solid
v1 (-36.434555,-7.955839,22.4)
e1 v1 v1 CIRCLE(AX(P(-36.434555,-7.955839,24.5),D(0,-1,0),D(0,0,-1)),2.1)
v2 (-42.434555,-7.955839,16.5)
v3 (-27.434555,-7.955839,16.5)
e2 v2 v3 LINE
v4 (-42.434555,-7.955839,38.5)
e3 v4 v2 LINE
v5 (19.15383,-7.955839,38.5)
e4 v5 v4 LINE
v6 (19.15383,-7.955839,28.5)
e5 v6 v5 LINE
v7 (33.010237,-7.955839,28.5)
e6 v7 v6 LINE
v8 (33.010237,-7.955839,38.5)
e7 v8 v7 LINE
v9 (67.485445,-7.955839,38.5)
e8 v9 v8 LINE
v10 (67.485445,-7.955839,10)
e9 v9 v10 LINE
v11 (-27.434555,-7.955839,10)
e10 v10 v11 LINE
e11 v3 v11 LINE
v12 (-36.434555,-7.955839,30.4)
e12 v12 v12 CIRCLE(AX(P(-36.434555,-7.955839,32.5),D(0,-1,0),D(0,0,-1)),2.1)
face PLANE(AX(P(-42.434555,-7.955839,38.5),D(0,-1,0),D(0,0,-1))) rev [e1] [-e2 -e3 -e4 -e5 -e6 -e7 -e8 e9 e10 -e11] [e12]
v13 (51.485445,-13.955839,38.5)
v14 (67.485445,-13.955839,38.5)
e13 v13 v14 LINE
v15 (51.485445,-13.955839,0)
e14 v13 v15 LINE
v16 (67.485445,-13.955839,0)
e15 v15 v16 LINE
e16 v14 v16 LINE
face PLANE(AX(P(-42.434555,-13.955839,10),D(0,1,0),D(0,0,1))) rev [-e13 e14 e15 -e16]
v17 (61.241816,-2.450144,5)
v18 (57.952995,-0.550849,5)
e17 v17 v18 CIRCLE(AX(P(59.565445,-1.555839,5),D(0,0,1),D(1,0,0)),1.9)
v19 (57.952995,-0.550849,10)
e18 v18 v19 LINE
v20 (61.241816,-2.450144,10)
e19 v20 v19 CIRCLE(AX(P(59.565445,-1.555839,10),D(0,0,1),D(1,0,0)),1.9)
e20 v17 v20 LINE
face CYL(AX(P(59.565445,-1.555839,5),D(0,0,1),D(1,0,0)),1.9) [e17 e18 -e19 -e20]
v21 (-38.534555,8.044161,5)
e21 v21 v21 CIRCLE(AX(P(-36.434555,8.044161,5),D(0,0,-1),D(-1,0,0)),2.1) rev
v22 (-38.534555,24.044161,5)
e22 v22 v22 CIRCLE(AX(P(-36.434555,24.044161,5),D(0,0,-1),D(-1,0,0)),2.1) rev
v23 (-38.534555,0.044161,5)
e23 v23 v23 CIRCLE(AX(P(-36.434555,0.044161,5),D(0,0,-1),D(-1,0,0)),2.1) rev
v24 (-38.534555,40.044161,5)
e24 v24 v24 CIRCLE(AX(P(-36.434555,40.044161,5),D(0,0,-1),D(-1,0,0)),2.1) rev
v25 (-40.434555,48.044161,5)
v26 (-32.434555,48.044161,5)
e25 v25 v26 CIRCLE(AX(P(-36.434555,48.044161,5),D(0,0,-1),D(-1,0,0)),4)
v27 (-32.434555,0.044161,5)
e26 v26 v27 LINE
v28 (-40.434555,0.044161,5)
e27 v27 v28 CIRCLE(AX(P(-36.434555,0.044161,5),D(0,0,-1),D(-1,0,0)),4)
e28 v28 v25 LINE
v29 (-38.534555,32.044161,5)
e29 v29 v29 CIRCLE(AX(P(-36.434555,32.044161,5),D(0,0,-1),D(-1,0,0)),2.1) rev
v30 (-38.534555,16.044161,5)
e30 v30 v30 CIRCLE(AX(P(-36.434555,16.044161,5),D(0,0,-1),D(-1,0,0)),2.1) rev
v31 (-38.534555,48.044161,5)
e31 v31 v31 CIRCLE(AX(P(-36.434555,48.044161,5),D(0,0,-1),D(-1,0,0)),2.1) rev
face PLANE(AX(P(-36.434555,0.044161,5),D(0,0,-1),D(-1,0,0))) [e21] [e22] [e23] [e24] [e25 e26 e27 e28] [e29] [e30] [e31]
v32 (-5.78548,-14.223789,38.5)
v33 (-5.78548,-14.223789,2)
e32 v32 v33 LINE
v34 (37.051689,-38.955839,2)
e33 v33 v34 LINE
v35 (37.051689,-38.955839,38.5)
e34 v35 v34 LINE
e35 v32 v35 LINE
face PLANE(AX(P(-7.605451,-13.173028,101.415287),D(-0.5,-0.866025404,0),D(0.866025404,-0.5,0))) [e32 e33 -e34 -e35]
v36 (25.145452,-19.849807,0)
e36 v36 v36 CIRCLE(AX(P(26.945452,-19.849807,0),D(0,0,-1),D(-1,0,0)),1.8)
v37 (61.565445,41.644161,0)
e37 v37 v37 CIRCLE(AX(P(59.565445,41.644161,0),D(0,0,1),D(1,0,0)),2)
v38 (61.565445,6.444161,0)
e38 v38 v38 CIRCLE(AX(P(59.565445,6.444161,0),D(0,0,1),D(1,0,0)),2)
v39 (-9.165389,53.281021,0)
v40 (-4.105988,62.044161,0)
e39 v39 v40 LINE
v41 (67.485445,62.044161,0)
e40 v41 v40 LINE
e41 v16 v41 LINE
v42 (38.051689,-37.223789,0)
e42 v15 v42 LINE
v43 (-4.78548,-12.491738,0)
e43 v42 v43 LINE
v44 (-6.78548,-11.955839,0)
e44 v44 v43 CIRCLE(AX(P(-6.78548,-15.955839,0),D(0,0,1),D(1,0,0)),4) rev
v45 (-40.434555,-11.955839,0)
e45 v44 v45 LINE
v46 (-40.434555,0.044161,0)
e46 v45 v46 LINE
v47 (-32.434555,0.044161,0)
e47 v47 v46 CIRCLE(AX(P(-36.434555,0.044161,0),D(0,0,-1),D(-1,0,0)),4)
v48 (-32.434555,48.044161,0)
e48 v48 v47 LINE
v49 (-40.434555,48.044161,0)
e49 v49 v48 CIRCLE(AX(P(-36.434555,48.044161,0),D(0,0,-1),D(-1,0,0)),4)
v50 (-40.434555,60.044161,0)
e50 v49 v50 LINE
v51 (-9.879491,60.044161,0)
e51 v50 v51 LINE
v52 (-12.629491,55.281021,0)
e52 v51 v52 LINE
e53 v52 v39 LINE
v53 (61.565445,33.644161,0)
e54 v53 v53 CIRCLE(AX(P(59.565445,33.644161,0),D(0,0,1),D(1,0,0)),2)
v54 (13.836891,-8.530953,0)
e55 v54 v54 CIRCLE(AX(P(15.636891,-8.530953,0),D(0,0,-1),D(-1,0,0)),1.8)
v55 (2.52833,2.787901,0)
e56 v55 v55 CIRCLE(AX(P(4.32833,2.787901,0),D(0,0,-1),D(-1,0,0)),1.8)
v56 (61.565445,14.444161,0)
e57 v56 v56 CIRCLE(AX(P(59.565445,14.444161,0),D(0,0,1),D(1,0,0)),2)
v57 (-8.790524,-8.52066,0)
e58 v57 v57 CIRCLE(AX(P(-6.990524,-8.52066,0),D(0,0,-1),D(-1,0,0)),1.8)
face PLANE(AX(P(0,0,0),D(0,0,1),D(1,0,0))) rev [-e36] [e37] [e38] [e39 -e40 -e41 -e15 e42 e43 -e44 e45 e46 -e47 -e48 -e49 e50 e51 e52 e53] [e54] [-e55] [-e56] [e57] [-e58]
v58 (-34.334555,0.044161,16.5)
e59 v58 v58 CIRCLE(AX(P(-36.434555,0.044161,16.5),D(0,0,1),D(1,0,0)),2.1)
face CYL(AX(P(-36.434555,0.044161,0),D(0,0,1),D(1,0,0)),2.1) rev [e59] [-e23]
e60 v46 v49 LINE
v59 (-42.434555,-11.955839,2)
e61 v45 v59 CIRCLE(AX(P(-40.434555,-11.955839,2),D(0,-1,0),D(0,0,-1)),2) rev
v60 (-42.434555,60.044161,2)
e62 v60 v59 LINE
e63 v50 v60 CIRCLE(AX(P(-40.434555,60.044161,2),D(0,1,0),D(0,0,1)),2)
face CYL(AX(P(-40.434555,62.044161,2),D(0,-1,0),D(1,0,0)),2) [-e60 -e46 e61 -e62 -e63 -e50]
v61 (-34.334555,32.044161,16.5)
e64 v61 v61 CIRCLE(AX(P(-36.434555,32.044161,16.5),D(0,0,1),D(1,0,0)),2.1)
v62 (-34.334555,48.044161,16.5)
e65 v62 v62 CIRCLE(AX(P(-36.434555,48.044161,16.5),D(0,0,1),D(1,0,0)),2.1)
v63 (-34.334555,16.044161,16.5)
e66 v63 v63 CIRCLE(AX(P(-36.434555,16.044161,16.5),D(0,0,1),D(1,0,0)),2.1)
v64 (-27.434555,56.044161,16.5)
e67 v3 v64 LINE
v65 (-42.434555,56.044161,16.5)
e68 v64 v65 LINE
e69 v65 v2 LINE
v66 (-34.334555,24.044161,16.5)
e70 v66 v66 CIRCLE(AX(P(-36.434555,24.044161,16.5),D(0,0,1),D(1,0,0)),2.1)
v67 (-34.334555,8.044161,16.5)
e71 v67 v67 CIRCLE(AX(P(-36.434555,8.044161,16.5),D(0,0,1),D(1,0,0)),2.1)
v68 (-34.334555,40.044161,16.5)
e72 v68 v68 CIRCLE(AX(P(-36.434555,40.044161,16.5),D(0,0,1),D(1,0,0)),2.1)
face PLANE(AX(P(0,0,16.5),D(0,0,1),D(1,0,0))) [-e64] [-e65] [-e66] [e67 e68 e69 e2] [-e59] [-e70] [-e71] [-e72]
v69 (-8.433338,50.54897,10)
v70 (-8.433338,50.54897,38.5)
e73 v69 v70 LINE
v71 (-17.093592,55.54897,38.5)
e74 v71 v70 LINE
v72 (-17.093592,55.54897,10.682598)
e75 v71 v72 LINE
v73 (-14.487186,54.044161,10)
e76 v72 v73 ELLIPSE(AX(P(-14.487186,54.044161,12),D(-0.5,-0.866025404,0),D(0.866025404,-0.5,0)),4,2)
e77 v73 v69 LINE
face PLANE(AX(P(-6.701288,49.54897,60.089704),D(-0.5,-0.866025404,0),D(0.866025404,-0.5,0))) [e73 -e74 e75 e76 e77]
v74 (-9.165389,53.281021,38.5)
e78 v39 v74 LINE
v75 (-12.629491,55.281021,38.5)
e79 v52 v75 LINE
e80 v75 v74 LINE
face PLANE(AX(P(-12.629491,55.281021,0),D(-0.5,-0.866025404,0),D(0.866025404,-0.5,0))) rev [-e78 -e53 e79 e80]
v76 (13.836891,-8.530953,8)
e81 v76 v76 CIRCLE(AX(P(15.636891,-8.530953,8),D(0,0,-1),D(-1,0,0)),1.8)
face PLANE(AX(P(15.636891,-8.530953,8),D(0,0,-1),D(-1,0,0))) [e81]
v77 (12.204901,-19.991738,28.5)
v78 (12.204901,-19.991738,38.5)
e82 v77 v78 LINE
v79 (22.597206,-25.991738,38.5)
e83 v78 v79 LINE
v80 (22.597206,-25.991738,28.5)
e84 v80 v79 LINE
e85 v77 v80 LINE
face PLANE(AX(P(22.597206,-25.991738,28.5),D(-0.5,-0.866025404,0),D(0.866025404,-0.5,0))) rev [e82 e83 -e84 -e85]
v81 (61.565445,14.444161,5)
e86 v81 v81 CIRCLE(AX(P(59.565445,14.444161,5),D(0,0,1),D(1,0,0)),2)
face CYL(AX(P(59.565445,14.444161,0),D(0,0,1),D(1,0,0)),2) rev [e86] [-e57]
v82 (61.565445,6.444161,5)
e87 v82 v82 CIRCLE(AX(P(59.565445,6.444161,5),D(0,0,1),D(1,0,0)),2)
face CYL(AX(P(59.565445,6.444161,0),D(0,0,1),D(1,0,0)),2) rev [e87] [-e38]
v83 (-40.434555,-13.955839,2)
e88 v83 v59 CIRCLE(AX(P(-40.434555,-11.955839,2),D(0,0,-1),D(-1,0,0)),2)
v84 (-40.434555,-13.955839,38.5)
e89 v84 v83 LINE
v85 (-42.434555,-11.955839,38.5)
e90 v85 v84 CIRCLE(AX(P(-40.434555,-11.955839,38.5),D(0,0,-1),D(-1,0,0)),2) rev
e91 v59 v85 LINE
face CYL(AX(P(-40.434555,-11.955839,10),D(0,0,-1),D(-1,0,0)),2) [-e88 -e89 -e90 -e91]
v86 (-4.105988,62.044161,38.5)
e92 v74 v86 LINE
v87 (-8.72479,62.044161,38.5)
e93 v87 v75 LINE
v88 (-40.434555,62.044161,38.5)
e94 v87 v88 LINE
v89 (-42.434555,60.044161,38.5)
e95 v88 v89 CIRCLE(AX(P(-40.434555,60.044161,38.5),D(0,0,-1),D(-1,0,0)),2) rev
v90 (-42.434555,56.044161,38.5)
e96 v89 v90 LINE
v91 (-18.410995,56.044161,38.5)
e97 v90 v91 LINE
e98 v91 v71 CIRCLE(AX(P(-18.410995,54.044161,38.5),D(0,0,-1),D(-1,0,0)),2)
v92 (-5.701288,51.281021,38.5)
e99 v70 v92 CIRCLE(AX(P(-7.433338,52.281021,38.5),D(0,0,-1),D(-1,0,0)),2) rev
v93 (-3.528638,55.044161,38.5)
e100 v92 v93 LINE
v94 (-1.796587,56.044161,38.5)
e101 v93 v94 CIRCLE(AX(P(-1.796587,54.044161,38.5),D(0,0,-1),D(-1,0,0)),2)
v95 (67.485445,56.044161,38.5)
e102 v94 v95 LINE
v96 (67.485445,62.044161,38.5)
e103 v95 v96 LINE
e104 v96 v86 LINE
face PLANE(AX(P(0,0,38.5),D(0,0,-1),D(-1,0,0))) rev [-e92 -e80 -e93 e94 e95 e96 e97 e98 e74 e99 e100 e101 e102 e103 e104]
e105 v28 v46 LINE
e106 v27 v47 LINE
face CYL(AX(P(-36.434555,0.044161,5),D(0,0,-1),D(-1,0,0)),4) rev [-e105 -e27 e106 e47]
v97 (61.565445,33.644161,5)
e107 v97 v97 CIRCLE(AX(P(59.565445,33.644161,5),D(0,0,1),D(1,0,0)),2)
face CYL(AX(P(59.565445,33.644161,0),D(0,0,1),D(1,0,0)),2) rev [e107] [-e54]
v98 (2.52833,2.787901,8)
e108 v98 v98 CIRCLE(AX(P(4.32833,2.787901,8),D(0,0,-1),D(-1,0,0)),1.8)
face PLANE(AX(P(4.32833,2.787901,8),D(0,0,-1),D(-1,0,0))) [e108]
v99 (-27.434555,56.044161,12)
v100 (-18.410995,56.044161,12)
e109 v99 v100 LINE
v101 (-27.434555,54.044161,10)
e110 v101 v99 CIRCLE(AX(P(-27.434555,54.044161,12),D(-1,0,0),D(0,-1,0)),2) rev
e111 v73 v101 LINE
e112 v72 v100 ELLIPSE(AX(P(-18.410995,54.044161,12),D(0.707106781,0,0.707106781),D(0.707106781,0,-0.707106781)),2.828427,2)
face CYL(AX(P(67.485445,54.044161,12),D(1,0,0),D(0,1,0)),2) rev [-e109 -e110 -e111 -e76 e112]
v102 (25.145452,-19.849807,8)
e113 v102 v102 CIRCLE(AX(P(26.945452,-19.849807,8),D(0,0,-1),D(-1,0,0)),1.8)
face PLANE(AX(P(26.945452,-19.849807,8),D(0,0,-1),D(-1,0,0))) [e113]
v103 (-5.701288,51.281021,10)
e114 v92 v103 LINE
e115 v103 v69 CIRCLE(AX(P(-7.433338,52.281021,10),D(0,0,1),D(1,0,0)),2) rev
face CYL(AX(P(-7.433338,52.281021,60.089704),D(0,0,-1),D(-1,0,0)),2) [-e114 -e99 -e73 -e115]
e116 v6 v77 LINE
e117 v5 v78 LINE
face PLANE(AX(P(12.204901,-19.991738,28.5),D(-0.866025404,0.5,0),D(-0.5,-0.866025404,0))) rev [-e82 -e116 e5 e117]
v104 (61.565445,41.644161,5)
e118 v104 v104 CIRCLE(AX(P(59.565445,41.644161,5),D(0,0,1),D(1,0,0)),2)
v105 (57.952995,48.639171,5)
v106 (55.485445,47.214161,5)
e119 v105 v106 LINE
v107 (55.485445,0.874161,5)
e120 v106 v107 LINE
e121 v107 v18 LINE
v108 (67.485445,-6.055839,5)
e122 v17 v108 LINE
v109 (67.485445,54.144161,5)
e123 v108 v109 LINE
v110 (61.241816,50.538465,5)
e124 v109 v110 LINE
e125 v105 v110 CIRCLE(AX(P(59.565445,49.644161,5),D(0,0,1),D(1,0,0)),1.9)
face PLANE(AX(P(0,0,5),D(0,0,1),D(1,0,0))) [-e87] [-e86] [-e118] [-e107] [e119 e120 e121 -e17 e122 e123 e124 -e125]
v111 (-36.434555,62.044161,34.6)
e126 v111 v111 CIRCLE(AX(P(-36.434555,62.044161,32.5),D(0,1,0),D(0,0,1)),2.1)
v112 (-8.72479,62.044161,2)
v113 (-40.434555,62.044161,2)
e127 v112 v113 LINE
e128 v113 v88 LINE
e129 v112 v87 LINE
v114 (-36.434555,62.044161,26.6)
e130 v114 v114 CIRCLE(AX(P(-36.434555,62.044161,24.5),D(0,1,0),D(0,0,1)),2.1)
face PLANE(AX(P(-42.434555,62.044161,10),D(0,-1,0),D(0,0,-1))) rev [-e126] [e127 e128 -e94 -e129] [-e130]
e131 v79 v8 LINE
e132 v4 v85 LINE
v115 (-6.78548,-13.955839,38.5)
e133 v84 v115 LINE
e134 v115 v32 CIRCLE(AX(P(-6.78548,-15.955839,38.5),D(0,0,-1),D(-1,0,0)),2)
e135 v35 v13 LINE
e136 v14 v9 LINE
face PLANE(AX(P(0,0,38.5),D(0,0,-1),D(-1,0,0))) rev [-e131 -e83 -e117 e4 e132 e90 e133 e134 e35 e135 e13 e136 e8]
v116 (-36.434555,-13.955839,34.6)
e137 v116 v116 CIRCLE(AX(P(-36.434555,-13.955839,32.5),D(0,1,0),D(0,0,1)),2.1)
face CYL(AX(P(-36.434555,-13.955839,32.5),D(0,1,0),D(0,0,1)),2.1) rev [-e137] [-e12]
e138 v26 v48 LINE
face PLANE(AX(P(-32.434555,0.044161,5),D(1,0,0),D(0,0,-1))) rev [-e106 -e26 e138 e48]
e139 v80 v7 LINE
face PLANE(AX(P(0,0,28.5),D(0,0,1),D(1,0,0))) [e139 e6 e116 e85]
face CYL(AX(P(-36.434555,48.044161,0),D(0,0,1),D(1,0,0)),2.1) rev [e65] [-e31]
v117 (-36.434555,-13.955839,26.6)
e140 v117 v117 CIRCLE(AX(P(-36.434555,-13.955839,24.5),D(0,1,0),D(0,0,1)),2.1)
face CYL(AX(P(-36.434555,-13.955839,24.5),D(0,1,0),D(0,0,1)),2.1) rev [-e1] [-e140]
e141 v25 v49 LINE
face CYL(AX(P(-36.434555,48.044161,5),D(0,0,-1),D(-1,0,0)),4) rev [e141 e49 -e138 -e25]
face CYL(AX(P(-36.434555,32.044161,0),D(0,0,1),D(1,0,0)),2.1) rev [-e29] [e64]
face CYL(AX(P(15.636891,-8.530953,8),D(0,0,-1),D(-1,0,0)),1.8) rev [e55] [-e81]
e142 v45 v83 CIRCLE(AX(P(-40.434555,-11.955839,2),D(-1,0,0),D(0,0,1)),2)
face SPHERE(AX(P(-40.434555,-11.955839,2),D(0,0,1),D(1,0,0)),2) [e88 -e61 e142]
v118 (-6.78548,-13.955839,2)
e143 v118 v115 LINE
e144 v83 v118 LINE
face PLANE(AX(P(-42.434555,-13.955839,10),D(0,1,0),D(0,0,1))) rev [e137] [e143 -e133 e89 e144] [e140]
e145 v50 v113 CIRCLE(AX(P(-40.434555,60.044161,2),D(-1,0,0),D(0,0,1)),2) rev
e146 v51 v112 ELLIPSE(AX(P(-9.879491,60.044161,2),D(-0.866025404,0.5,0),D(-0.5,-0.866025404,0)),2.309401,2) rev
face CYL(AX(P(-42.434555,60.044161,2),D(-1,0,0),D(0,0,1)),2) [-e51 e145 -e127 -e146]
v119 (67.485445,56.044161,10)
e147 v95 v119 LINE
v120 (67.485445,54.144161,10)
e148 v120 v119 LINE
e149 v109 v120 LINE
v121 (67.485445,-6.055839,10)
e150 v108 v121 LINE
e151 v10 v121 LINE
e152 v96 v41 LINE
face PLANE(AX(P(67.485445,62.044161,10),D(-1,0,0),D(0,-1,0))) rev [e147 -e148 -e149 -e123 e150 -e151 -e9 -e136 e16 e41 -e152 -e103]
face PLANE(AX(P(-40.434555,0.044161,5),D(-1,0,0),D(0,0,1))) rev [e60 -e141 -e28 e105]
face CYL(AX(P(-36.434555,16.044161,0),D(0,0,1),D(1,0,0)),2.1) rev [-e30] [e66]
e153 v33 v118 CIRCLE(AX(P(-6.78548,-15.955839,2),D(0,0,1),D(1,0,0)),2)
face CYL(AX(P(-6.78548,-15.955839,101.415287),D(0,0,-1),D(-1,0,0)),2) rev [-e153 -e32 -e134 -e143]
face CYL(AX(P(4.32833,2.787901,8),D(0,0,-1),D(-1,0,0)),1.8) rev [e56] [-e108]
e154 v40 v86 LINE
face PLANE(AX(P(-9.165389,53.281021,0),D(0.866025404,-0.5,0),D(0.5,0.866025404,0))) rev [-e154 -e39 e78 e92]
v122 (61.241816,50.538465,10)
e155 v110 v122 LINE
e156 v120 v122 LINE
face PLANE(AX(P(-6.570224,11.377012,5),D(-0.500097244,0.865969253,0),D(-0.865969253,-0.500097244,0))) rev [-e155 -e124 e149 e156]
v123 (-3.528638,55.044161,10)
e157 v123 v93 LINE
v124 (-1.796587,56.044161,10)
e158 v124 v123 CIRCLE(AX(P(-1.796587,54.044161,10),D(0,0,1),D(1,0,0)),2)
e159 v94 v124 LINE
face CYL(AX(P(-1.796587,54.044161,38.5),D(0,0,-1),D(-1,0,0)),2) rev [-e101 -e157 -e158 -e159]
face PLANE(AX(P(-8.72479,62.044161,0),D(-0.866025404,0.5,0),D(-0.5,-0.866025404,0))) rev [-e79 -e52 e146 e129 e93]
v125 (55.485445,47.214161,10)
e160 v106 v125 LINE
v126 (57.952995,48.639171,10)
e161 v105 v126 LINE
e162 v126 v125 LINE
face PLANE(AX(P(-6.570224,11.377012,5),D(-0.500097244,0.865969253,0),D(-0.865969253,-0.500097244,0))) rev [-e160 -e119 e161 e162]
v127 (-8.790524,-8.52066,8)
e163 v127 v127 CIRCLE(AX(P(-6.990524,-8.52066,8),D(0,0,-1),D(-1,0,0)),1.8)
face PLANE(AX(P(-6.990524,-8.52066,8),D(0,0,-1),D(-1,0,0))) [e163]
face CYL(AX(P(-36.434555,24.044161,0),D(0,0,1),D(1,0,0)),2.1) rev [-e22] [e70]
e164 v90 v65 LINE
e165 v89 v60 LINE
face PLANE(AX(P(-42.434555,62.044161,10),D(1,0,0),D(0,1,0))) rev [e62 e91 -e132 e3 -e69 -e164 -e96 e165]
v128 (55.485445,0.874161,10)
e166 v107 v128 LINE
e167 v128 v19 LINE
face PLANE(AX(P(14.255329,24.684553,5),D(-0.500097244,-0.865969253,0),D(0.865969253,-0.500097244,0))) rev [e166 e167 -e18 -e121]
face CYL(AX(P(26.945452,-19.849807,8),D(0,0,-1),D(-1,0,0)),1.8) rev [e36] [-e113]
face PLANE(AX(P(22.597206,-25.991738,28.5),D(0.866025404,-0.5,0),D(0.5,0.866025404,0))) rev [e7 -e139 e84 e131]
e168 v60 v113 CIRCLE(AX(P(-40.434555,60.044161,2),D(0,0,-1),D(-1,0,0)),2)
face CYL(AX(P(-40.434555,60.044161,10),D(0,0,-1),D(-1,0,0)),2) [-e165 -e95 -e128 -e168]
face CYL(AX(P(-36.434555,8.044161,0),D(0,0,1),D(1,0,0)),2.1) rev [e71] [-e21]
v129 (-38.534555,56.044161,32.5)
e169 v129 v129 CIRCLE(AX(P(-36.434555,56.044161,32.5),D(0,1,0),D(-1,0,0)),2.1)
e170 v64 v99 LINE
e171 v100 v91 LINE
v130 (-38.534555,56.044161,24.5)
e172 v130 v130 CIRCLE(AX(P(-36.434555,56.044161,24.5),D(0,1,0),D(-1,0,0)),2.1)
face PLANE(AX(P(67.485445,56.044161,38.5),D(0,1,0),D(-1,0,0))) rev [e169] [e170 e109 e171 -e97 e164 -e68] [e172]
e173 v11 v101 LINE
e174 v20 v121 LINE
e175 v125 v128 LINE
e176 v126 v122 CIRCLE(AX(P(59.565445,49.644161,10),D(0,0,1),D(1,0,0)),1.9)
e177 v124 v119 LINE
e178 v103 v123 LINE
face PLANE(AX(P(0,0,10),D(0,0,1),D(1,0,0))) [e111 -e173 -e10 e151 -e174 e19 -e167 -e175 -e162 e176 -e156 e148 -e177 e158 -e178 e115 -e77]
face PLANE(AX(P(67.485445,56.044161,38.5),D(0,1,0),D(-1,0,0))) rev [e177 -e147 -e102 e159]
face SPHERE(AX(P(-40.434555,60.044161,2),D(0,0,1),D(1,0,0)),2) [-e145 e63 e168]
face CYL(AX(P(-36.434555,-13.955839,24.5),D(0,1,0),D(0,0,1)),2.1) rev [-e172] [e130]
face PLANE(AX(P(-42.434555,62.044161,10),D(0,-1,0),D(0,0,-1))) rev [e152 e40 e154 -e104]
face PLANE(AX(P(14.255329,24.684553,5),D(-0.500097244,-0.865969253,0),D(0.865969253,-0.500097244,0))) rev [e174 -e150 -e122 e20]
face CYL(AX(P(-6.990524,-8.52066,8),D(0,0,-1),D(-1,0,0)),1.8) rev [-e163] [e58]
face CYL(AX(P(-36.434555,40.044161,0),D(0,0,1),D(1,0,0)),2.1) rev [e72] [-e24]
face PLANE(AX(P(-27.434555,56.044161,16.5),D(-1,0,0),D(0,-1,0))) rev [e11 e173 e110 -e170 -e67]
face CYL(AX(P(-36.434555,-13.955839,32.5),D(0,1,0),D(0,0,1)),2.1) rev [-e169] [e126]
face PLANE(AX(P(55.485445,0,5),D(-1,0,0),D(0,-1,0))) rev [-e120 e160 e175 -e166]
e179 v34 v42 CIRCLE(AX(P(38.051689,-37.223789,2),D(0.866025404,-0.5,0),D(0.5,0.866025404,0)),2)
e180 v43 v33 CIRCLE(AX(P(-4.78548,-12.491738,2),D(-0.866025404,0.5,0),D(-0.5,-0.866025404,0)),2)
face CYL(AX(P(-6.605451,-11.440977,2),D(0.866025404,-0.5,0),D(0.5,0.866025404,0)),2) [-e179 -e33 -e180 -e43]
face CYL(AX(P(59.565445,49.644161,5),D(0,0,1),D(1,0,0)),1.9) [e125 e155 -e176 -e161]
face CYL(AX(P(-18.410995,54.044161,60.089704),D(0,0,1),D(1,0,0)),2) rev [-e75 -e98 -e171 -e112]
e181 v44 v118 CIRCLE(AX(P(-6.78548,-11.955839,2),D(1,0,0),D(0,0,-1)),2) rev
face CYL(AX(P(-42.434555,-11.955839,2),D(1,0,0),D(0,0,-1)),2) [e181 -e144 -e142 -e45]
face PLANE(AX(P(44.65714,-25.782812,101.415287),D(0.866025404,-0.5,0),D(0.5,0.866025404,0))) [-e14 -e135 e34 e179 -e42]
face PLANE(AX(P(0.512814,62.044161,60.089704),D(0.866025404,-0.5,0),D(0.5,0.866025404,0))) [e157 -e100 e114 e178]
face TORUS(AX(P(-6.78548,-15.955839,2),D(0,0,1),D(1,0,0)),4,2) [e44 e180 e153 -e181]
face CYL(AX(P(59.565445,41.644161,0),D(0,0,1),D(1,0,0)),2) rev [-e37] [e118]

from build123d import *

# Parameters (mm, degrees)
SKETCH_2_W               = 109.92
SKETCH_2_H               = 76
EXTRUDE_1_DEPTH          = 10
CUT_EXTRUDE_1_DEPTH      = 5
SKETCH_4_R               = 2
CUT_EXTRUDE_2_DEPTH      = 92.808295873
SKETCH_5_W               = 109.92
SKETCH_5_H               = 6
EXTRUDE_2_DEPTH          = 28.5
SKETCH_6_W               = 15
SKETCH_6_H               = 64
EXTRUDE_3_DEPTH          = 6.5
CUT_EXTRUDE_3_DEPTH      = 105.577891178
CUT_EXTRUDE_3_DEPTH_BACK = 105.577891178
SKETCH_7_R               = 2.1
SKETCH_9_R               = 2.1
CUT_EXTRUDE_4_DEPTH      = 95.274934055
CUT_EXTRUDE_5_DEPTH      = 5
EXTRUDE_4_DEPTH          = 38.5
CUT_EXTRUDE_6_DEPTH      = 10
CUT_EXTRUDE_7_REACH      = 103.379
SKETCH_18_W              = 12
SKETCH_18_H              = 10
EXTRUDE_5_DEPTH          = 38.5
CUT_EXTRUDE_8_DEPTH      = 100.428432508
FILLET_1_R               = 2
SKETCH_23_R              = 1.8
CUT_EXTRUDE_10_DEPTH     = 8


with BuildPart() as part:
    # 草圖2 → 填料-伸長1 (new body)
    with BuildSketch(Plane.XY):
        with Locations((12.52544527, 24.044160626)):
            Rectangle(SKETCH_2_W, SKETCH_2_H)
    extrude(amount=EXTRUDE_1_DEPTH)

    # 草圖3 → 除料-伸長1 (cut)
    with BuildSketch(Plane.XY.offset(10)):
        with BuildLine():
            Line((67.48544527, -6.055839374), (67.48544527, 54.144160626))
            Line((67.48544527, 54.144160626), (61.24181631, 50.538464901))
            ThreePointArc((61.24181631, 50.538464901), (61.408690367, 50.105080914), (61.46544527, 49.644160626))
            ThreePointArc((61.46544527, 49.644160626), (60.088104264, 47.81746208), (57.95299519, 48.639170705))
            Line((57.95299519, 48.639170705), (55.48544527, 47.214160626))
            Line((55.48544527, 47.214160626), (55.48544527, 0.874160626))
            Line((55.48544527, 0.874160626), (57.95299519, -0.550849453))
            ThreePointArc((57.95299519, -0.550849453), (60.088104264, 0.270859171), (61.46544527, -1.555839374))
            ThreePointArc((61.46544527, -1.555839374), (61.408690367, -2.016759663), (61.24181631, -2.45014365))
            Line((61.24181631, -2.45014365), (67.48544527, -6.055839374))
        make_face()
    extrude(amount=-CUT_EXTRUDE_1_DEPTH, mode=Mode.SUBTRACT)

    # 草圖4 → 除料-伸長2 (cut, through all)
    with BuildSketch(Plane.XY.offset(5)):
        with Locations((59.56544527, 41.644160626)):
            Circle(SKETCH_4_R)
        with Locations((59.56544527, 33.644160626)):
            Circle(SKETCH_4_R)
        with Locations((59.56544527, 6.444160626)):
            Circle(SKETCH_4_R)
        with Locations((59.56544527, 14.444160626)):
            Circle(SKETCH_4_R)
    extrude(amount=-CUT_EXTRUDE_2_DEPTH, mode=Mode.SUBTRACT)

    # 草圖5 → 填料-伸長2 (add)
    with BuildSketch(Plane.XY.offset(10)):
        with Locations((12.52544527, -10.955839374)):
            Rectangle(SKETCH_5_W, SKETCH_5_H)
        with Locations((12.52544527, 59.044160626)):
            Rectangle(SKETCH_5_W, SKETCH_5_H)
    extrude(amount=EXTRUDE_2_DEPTH)

    # 草圖6 → 填料-伸長3 (add)
    with BuildSketch(Plane.XY.offset(10)):
        with Locations((-34.93455473, 24.044160626)):
            Rectangle(SKETCH_6_W, SKETCH_6_H)
    extrude(amount=EXTRUDE_3_DEPTH)

    # 草圖7 → 除料-伸長3 (cut, two sides: drawn at the far end of the back side and taken through both)
    with BuildSketch(Plane(origin=(0, -7.955839374, 0), x_dir=(1, 0, 0), z_dir=(0, 1, 0)).offset(-CUT_EXTRUDE_3_DEPTH_BACK)):
        with Locations(Location((-36.43455473, -24.5, 0), (0, 0, 270))):
            Circle(SKETCH_7_R)
        with Locations(Location((-36.43455473, -32.5, 0), (0, 0, 270))):
            Circle(SKETCH_7_R)
    extrude(amount=CUT_EXTRUDE_3_DEPTH + CUT_EXTRUDE_3_DEPTH_BACK, mode=Mode.SUBTRACT)

    # 草圖9 → 除料-伸長4 (cut, through all)
    with BuildSketch(Plane.XY.offset(16.5)):
        with Locations((-36.43455473, 0.044160626)):
            Circle(SKETCH_9_R)
        with Locations((-36.43455473, 8.044160626)):
            Circle(SKETCH_9_R)
        with Locations((-36.43455473, 16.044160626)):
            Circle(SKETCH_9_R)
        with Locations((-36.43455473, 24.044160626)):
            Circle(SKETCH_9_R)
        with Locations((-36.43455473, 32.044160626)):
            Circle(SKETCH_9_R)
        with Locations((-36.43455473, 40.044160626)):
            Circle(SKETCH_9_R)
        with Locations((-36.43455473, 48.044160626)):
            Circle(SKETCH_9_R)
    extrude(amount=-CUT_EXTRUDE_4_DEPTH, mode=Mode.SUBTRACT)

    # 草圖10 → 除料-伸長5 (cut)
    with BuildSketch(Plane(origin=(0, 0, 0), x_dir=(-1, 0, 0), z_dir=(0, 0, -1))):
        with BuildLine():
            Line((32.43455473, 0.044160626), (32.43455473, 48.044160626))
            ThreePointArc((32.43455473, 48.044160626), (36.43455473, 52.044160626), (40.43455473, 48.044160626))
            Line((40.43455473, 48.044160626), (40.43455473, 0.044160626))
            ThreePointArc((40.43455473, 0.044160626), (36.43455473, -3.955839374), (32.43455473, 0.044160626))
        make_face()
    extrude(amount=-CUT_EXTRUDE_5_DEPTH, mode=Mode.SUBTRACT)

    # 草圖11 → 填料-伸長4 (add)
    with BuildSketch(Plane(origin=(0, 0, 0), x_dir=(-1, 0, 0), z_dir=(0, 0, -1))):
        Polygon((6.249581649, -13.955839374), (-51.48544527, -13.955839374), (-37.05168854, -38.955839374), align=None)
    extrude(amount=-EXTRUDE_4_DEPTH)

    # 草圖17 → 除料-伸長6 (cut)
    with BuildSketch(Plane.XY.offset(38.5)):
        Polygon((22.597205868, -25.991737759), (12.204901023, -19.991737759), (16.704901023, -12.197509125), (27.097205868, -18.197509125), align=None)
    extrude(amount=-CUT_EXTRUDE_6_DEPTH, mode=Mode.SUBTRACT)

    # 草圖18 → 除料-伸長7 (cut, up to next)
    with BuildSketch(Plane(origin=(-1.105451127, -1.914697517, 0), x_dir=(0.8660254037844504, -0.49999999999997985, 0), z_dir=(-0.4999999999999798, -0.8660254037844503, 0)), mode=Mode.PRIVATE) as cut_extrude_7_sk1:
        with Locations((26.565623216, 33.5)):
            Rectangle(SKETCH_18_W, SKETCH_18_H)
    cut_extrude_7_tool1 = extrude(cut_extrude_7_sk1.sketch, amount=-CUT_EXTRUDE_7_REACH, mode=Mode.PRIVATE) & part.part
    add(cut_extrude_7_tool1.solids().sort_by_distance((21.901053, -15.197509, 33.5))[0], mode=Mode.SUBTRACT)

    # 草圖20 → 填料-伸長5 (add)
    with BuildSketch(Plane(origin=(0, 0, 0), x_dir=(-1, 0, 0), z_dir=(0, 0, -1))):
        Polygon((-0.512814044, 62.044160626), (6.701287571, 49.548970097), (17.093592417, 55.548970097), (13.343592417, 62.044160626), align=None)
    extrude(amount=-EXTRUDE_5_DEPTH)

    # 草圖21 → 除料-伸長8 (cut, through all)
    with BuildSketch(Plane.XY.offset(38.5)):
        Polygon((-4.10598811, 62.044160626), (-8.724790263, 62.044160626), (-12.629490801, 55.281020905), (-9.165389186, 53.281020905), align=None)
    extrude(amount=-CUT_EXTRUDE_8_DEPTH, mode=Mode.SUBTRACT)

    # 圓角1
    # the kernel refuses this fillet: 2 mm, written as the material it adds along each edge
    with BuildSketch(Plane(origin=(-6.249581649, -13.955839374, 0), x_dir=(-1, 0, 0), z_dir=(0, 0, 1))) as fillet_1_piece_1:
        with BuildLine():
            CenterArc((FILLET_1_R * 0.267949192431, FILLET_1_R), FILLET_1_R, 240, 30)
            Line((-FILLET_1_R * 0.232050807569, FILLET_1_R * 0.133974596216), (0, 0))
            Line((0, 0), (FILLET_1_R * 0.267949192431, 0))
        make_face()
    extrude(amount=38.5)
    with BuildSketch(Plane(origin=(-32.43455473, 56.044160626, 10), x_dir=(0, 0, 1), z_dir=(1, 0, 0))) as fillet_1_piece_2_section:
        with BuildLine():
            CenterArc((FILLET_1_R, FILLET_1_R), FILLET_1_R, 180, 90)
            Line((0, FILLET_1_R), (0, 0))
            Line((0, 0), (FILLET_1_R, 0))
        make_face()
    fillet_1_piece_2 = extrude(amount=20.626860698, mode=Mode.PRIVATE)
    fillet_1_piece_2 = split(fillet_1_piece_2, bisect_by=Plane(origin=(-27.81373794, 64.047650078, 10), z_dir=(-0.5000000000000001, -0.8660254037844386, 0)), keep=Keep.TOP, mode=Mode.PRIVATE)
    add(fillet_1_piece_2)
    with BuildSketch(Plane(origin=(-2.951287571, 56.044160626, 38.5), x_dir=(1, 0, 0), z_dir=(0, 0, -1))) as fillet_1_piece_3:
        with BuildLine():
            CenterArc((FILLET_1_R * 0.57735026919, FILLET_1_R), FILLET_1_R, 210, 60)
            Line((-FILLET_1_R * 0.288675134595, FILLET_1_R * 0.5), (0, 0))
            Line((0, 0), (FILLET_1_R * 0.57735026919, 0))
        make_face()
    extrude(amount=31.386751346)
    with BuildSketch(Plane(origin=(-16.807694032, 56.044160626, 5.991748635), x_dir=(-0.5000000000023799, -0.8660254037830647, 0), z_dir=(0, 0, 1))) as fillet_1_piece_4:
        with BuildLine():
            CenterArc((2.533701081, -0.388499003), FILLET_1_R, 168.799115107, 41.200884893)
            Line((0.801650273, -1.388499003), (0, 0))
            Line((0, 0), (0.57179677, 0))
        make_face()
    extrude(amount=32.508251365)
    # the kernel refuses this fillet: 2 mm, written as the material it takes off along each edge
    with BuildSketch(Plane(origin=(-40.43455473, 60.044160626, 2), x_dir=(0, 0, -1), z_dir=(0, 1, 0))) as fillet_1_2_piece_1_section:
        Polygon((0, 0), (FILLET_1_R * 1.02, 0), (FILLET_1_R * 1.02, FILLET_1_R * 1.02), (0, FILLET_1_R * 1.02), align=None)
    fillet_1_2_piece_1 = extrude(amount=FILLET_1_R * 1.02, mode=Mode.PRIVATE)
    fillet_1_2_piece_1 = fillet_1_2_piece_1 - Plane(origin=(-40.43455473, 60.044160626, 2), x_dir=(0.7071067811865475, 0, 0.7071067811865475), z_dir=(0, 1, 0)) * Sphere(FILLET_1_R, mode=Mode.PRIVATE)
    add(fillet_1_2_piece_1, mode=Mode.SUBTRACT)
    with BuildSketch(Plane(origin=(-42.43455473, -13.955839374, -5), x_dir=(1, 0, 0), z_dir=(0, 0, 1))) as fillet_1_2_piece_2:
        with BuildLine():
            CenterArc((FILLET_1_R, FILLET_1_R), FILLET_1_R, 180, 90)
            Line((0, FILLET_1_R), (0, 0))
            Line((0, 0), (FILLET_1_R, 0))
        make_face()
    extrude(amount=48.5, mode=Mode.SUBTRACT)
    with BuildSketch(Plane(origin=(-42.43455473, 62.044160626, 2), x_dir=(1, 0, 0), z_dir=(0, 0, 1))) as fillet_1_2_piece_3:
        with BuildLine():
            CenterArc((FILLET_1_R, -FILLET_1_R), FILLET_1_R, 90, 90)
            Line((0, -FILLET_1_R), (0, 0))
            Line((0, 0), (FILLET_1_R, 0))
        make_face()
    extrude(amount=41.5, mode=Mode.SUBTRACT)
    with BuildSketch(Plane(origin=(-42.43455473, -18.955839374, 0), x_dir=(0, 0, 1), z_dir=(0, 1, 0))) as fillet_1_2_piece_4:
        with BuildLine():
            CenterArc((FILLET_1_R, FILLET_1_R), FILLET_1_R, 180, 90)
            Line((0, FILLET_1_R), (0, 0))
            Line((0, 0), (FILLET_1_R, 0))
        make_face()
    extrude(amount=79, mode=Mode.SUBTRACT)
    with BuildSketch(Plane(origin=(-6.701287571, 49.548970097, 10), x_dir=(-0.8660254037844417, 0.4999999999999948, 0), z_dir=(0, 0, 1))) as fillet_1_2_piece_5:
        with BuildLine():
            CenterArc((FILLET_1_R, -FILLET_1_R), FILLET_1_R, 90, 90)
            Line((0, -FILLET_1_R), (0, 0))
            Line((0, 0), (FILLET_1_R, 0))
        make_face()
    extrude(amount=33.5, mode=Mode.SUBTRACT)
    with BuildSketch(Plane(origin=(-3.724790263, 62.044160626, 0), x_dir=(0, 0, 1), z_dir=(-1, 0, 0))) as fillet_1_2_piece_6_section:
        with BuildLine():
            CenterArc((FILLET_1_R, -FILLET_1_R), FILLET_1_R, 90, 90)
            Line((0, -FILLET_1_R), (0, 0))
            Line((0, 0), (FILLET_1_R, 0))
        make_face()
    fillet_1_2_piece_6 = extrude(amount=36.709764467, mode=Mode.PRIVATE)
    fillet_1_2_piece_6 = split(fillet_1_2_piece_6, bisect_by=Plane(origin=(-7.474790263, 64.209224135, 0), z_dir=(-0.8660254037844323, 0.500000000000011, 0)), keep=Keep.TOP, mode=Mode.PRIVATE)
    add(fillet_1_2_piece_6, mode=Mode.SUBTRACT)
    # the kernel refuses this fillet: 2 mm, written as the material it takes off along each edge
    with BuildSketch(Plane(origin=(-40.43455473, -11.955839374, 2), x_dir=(0, -1, 0), z_dir=(0, 0, -1))) as fillet_1_3_piece_1_section:
        Polygon((0, 0), (FILLET_1_R * 1.02, 0), (FILLET_1_R * 1.02, FILLET_1_R * 1.02), (0, FILLET_1_R * 1.02), align=None)
    fillet_1_3_piece_1 = extrude(amount=FILLET_1_R * 1.02, mode=Mode.PRIVATE)
    fillet_1_3_piece_1 = fillet_1_3_piece_1 - Plane(origin=(-40.43455473, -11.955839374, 2), x_dir=(0.7071067811865475, 0.7071067811865475, 0), z_dir=(0, 0, -1)) * Sphere(FILLET_1_R, mode=Mode.PRIVATE)
    add(fillet_1_3_piece_1, mode=Mode.SUBTRACT)
    with BuildSketch(Plane(origin=(-6.785480034, -13.955839374, 0), x_dir=(0, 1, 0), z_dir=(-1, 0, 0))) as fillet_1_3_piece_2:
        with BuildLine():
            CenterArc((FILLET_1_R, -FILLET_1_R), FILLET_1_R, 90, 90)
            Line((0, -FILLET_1_R), (0, 0))
            Line((0, 0), (FILLET_1_R, 0))
        make_face()
    extrude(amount=33.649074696, mode=Mode.SUBTRACT)
    with BuildSketch(Plane(origin=(41.381815559, -41.455839374, 0), x_dir=(0.499999999999995, 0.8660254037844416, 0), z_dir=(-0.8660254037844416, 0.49999999999999506, 0))) as fillet_1_3_piece_3:
        with BuildLine():
            CenterArc((FILLET_1_R, -FILLET_1_R), FILLET_1_R, 90, 90)
            Line((0, -FILLET_1_R), (0, 0))
            Line((0, 0), (FILLET_1_R, 0))
        make_face()
    extrude(amount=54.464101615, mode=Mode.SUBTRACT)
    with BuildSketch(Plane(origin=(-6.785480034, -15.955839374, 0), x_dir=(0, 1, 0), z_dir=(-1, 0, 0))) as fillet_1_3_piece_4:
        with BuildLine():
            CenterArc((2 + FILLET_1_R, -FILLET_1_R), FILLET_1_R, 90, 90)
            Line((2, -FILLET_1_R), (2, 0))
            Line((2, 0), (2 + FILLET_1_R, 0))
        make_face()
    revolve(axis=Axis((-6.785480034, -15.955839374, 0), (0, 0, -1)), revolution_arc=30, mode=Mode.SUBTRACT)

    # 草圖23 → 除料-伸長10 (cut)
    with BuildSketch(Plane(origin=(0, 0, 0), x_dir=(-1, 0, 0), z_dir=(0, 0, -1))):
        with Locations((-26.945451548, -19.849806604)):
            Circle(SKETCH_23_R)
        with Locations((-15.636890672, -8.530952823)):
            Circle(SKETCH_23_R)
        with Locations((-4.328329796, 2.787900958)):
            Circle(SKETCH_23_R)
        with Locations((6.990523985, -8.520659918)):
            Circle(SKETCH_23_R)
    extrude(amount=-CUT_EXTRUDE_10_DEPTH, mode=Mode.SUBTRACT)


solid = part.part
